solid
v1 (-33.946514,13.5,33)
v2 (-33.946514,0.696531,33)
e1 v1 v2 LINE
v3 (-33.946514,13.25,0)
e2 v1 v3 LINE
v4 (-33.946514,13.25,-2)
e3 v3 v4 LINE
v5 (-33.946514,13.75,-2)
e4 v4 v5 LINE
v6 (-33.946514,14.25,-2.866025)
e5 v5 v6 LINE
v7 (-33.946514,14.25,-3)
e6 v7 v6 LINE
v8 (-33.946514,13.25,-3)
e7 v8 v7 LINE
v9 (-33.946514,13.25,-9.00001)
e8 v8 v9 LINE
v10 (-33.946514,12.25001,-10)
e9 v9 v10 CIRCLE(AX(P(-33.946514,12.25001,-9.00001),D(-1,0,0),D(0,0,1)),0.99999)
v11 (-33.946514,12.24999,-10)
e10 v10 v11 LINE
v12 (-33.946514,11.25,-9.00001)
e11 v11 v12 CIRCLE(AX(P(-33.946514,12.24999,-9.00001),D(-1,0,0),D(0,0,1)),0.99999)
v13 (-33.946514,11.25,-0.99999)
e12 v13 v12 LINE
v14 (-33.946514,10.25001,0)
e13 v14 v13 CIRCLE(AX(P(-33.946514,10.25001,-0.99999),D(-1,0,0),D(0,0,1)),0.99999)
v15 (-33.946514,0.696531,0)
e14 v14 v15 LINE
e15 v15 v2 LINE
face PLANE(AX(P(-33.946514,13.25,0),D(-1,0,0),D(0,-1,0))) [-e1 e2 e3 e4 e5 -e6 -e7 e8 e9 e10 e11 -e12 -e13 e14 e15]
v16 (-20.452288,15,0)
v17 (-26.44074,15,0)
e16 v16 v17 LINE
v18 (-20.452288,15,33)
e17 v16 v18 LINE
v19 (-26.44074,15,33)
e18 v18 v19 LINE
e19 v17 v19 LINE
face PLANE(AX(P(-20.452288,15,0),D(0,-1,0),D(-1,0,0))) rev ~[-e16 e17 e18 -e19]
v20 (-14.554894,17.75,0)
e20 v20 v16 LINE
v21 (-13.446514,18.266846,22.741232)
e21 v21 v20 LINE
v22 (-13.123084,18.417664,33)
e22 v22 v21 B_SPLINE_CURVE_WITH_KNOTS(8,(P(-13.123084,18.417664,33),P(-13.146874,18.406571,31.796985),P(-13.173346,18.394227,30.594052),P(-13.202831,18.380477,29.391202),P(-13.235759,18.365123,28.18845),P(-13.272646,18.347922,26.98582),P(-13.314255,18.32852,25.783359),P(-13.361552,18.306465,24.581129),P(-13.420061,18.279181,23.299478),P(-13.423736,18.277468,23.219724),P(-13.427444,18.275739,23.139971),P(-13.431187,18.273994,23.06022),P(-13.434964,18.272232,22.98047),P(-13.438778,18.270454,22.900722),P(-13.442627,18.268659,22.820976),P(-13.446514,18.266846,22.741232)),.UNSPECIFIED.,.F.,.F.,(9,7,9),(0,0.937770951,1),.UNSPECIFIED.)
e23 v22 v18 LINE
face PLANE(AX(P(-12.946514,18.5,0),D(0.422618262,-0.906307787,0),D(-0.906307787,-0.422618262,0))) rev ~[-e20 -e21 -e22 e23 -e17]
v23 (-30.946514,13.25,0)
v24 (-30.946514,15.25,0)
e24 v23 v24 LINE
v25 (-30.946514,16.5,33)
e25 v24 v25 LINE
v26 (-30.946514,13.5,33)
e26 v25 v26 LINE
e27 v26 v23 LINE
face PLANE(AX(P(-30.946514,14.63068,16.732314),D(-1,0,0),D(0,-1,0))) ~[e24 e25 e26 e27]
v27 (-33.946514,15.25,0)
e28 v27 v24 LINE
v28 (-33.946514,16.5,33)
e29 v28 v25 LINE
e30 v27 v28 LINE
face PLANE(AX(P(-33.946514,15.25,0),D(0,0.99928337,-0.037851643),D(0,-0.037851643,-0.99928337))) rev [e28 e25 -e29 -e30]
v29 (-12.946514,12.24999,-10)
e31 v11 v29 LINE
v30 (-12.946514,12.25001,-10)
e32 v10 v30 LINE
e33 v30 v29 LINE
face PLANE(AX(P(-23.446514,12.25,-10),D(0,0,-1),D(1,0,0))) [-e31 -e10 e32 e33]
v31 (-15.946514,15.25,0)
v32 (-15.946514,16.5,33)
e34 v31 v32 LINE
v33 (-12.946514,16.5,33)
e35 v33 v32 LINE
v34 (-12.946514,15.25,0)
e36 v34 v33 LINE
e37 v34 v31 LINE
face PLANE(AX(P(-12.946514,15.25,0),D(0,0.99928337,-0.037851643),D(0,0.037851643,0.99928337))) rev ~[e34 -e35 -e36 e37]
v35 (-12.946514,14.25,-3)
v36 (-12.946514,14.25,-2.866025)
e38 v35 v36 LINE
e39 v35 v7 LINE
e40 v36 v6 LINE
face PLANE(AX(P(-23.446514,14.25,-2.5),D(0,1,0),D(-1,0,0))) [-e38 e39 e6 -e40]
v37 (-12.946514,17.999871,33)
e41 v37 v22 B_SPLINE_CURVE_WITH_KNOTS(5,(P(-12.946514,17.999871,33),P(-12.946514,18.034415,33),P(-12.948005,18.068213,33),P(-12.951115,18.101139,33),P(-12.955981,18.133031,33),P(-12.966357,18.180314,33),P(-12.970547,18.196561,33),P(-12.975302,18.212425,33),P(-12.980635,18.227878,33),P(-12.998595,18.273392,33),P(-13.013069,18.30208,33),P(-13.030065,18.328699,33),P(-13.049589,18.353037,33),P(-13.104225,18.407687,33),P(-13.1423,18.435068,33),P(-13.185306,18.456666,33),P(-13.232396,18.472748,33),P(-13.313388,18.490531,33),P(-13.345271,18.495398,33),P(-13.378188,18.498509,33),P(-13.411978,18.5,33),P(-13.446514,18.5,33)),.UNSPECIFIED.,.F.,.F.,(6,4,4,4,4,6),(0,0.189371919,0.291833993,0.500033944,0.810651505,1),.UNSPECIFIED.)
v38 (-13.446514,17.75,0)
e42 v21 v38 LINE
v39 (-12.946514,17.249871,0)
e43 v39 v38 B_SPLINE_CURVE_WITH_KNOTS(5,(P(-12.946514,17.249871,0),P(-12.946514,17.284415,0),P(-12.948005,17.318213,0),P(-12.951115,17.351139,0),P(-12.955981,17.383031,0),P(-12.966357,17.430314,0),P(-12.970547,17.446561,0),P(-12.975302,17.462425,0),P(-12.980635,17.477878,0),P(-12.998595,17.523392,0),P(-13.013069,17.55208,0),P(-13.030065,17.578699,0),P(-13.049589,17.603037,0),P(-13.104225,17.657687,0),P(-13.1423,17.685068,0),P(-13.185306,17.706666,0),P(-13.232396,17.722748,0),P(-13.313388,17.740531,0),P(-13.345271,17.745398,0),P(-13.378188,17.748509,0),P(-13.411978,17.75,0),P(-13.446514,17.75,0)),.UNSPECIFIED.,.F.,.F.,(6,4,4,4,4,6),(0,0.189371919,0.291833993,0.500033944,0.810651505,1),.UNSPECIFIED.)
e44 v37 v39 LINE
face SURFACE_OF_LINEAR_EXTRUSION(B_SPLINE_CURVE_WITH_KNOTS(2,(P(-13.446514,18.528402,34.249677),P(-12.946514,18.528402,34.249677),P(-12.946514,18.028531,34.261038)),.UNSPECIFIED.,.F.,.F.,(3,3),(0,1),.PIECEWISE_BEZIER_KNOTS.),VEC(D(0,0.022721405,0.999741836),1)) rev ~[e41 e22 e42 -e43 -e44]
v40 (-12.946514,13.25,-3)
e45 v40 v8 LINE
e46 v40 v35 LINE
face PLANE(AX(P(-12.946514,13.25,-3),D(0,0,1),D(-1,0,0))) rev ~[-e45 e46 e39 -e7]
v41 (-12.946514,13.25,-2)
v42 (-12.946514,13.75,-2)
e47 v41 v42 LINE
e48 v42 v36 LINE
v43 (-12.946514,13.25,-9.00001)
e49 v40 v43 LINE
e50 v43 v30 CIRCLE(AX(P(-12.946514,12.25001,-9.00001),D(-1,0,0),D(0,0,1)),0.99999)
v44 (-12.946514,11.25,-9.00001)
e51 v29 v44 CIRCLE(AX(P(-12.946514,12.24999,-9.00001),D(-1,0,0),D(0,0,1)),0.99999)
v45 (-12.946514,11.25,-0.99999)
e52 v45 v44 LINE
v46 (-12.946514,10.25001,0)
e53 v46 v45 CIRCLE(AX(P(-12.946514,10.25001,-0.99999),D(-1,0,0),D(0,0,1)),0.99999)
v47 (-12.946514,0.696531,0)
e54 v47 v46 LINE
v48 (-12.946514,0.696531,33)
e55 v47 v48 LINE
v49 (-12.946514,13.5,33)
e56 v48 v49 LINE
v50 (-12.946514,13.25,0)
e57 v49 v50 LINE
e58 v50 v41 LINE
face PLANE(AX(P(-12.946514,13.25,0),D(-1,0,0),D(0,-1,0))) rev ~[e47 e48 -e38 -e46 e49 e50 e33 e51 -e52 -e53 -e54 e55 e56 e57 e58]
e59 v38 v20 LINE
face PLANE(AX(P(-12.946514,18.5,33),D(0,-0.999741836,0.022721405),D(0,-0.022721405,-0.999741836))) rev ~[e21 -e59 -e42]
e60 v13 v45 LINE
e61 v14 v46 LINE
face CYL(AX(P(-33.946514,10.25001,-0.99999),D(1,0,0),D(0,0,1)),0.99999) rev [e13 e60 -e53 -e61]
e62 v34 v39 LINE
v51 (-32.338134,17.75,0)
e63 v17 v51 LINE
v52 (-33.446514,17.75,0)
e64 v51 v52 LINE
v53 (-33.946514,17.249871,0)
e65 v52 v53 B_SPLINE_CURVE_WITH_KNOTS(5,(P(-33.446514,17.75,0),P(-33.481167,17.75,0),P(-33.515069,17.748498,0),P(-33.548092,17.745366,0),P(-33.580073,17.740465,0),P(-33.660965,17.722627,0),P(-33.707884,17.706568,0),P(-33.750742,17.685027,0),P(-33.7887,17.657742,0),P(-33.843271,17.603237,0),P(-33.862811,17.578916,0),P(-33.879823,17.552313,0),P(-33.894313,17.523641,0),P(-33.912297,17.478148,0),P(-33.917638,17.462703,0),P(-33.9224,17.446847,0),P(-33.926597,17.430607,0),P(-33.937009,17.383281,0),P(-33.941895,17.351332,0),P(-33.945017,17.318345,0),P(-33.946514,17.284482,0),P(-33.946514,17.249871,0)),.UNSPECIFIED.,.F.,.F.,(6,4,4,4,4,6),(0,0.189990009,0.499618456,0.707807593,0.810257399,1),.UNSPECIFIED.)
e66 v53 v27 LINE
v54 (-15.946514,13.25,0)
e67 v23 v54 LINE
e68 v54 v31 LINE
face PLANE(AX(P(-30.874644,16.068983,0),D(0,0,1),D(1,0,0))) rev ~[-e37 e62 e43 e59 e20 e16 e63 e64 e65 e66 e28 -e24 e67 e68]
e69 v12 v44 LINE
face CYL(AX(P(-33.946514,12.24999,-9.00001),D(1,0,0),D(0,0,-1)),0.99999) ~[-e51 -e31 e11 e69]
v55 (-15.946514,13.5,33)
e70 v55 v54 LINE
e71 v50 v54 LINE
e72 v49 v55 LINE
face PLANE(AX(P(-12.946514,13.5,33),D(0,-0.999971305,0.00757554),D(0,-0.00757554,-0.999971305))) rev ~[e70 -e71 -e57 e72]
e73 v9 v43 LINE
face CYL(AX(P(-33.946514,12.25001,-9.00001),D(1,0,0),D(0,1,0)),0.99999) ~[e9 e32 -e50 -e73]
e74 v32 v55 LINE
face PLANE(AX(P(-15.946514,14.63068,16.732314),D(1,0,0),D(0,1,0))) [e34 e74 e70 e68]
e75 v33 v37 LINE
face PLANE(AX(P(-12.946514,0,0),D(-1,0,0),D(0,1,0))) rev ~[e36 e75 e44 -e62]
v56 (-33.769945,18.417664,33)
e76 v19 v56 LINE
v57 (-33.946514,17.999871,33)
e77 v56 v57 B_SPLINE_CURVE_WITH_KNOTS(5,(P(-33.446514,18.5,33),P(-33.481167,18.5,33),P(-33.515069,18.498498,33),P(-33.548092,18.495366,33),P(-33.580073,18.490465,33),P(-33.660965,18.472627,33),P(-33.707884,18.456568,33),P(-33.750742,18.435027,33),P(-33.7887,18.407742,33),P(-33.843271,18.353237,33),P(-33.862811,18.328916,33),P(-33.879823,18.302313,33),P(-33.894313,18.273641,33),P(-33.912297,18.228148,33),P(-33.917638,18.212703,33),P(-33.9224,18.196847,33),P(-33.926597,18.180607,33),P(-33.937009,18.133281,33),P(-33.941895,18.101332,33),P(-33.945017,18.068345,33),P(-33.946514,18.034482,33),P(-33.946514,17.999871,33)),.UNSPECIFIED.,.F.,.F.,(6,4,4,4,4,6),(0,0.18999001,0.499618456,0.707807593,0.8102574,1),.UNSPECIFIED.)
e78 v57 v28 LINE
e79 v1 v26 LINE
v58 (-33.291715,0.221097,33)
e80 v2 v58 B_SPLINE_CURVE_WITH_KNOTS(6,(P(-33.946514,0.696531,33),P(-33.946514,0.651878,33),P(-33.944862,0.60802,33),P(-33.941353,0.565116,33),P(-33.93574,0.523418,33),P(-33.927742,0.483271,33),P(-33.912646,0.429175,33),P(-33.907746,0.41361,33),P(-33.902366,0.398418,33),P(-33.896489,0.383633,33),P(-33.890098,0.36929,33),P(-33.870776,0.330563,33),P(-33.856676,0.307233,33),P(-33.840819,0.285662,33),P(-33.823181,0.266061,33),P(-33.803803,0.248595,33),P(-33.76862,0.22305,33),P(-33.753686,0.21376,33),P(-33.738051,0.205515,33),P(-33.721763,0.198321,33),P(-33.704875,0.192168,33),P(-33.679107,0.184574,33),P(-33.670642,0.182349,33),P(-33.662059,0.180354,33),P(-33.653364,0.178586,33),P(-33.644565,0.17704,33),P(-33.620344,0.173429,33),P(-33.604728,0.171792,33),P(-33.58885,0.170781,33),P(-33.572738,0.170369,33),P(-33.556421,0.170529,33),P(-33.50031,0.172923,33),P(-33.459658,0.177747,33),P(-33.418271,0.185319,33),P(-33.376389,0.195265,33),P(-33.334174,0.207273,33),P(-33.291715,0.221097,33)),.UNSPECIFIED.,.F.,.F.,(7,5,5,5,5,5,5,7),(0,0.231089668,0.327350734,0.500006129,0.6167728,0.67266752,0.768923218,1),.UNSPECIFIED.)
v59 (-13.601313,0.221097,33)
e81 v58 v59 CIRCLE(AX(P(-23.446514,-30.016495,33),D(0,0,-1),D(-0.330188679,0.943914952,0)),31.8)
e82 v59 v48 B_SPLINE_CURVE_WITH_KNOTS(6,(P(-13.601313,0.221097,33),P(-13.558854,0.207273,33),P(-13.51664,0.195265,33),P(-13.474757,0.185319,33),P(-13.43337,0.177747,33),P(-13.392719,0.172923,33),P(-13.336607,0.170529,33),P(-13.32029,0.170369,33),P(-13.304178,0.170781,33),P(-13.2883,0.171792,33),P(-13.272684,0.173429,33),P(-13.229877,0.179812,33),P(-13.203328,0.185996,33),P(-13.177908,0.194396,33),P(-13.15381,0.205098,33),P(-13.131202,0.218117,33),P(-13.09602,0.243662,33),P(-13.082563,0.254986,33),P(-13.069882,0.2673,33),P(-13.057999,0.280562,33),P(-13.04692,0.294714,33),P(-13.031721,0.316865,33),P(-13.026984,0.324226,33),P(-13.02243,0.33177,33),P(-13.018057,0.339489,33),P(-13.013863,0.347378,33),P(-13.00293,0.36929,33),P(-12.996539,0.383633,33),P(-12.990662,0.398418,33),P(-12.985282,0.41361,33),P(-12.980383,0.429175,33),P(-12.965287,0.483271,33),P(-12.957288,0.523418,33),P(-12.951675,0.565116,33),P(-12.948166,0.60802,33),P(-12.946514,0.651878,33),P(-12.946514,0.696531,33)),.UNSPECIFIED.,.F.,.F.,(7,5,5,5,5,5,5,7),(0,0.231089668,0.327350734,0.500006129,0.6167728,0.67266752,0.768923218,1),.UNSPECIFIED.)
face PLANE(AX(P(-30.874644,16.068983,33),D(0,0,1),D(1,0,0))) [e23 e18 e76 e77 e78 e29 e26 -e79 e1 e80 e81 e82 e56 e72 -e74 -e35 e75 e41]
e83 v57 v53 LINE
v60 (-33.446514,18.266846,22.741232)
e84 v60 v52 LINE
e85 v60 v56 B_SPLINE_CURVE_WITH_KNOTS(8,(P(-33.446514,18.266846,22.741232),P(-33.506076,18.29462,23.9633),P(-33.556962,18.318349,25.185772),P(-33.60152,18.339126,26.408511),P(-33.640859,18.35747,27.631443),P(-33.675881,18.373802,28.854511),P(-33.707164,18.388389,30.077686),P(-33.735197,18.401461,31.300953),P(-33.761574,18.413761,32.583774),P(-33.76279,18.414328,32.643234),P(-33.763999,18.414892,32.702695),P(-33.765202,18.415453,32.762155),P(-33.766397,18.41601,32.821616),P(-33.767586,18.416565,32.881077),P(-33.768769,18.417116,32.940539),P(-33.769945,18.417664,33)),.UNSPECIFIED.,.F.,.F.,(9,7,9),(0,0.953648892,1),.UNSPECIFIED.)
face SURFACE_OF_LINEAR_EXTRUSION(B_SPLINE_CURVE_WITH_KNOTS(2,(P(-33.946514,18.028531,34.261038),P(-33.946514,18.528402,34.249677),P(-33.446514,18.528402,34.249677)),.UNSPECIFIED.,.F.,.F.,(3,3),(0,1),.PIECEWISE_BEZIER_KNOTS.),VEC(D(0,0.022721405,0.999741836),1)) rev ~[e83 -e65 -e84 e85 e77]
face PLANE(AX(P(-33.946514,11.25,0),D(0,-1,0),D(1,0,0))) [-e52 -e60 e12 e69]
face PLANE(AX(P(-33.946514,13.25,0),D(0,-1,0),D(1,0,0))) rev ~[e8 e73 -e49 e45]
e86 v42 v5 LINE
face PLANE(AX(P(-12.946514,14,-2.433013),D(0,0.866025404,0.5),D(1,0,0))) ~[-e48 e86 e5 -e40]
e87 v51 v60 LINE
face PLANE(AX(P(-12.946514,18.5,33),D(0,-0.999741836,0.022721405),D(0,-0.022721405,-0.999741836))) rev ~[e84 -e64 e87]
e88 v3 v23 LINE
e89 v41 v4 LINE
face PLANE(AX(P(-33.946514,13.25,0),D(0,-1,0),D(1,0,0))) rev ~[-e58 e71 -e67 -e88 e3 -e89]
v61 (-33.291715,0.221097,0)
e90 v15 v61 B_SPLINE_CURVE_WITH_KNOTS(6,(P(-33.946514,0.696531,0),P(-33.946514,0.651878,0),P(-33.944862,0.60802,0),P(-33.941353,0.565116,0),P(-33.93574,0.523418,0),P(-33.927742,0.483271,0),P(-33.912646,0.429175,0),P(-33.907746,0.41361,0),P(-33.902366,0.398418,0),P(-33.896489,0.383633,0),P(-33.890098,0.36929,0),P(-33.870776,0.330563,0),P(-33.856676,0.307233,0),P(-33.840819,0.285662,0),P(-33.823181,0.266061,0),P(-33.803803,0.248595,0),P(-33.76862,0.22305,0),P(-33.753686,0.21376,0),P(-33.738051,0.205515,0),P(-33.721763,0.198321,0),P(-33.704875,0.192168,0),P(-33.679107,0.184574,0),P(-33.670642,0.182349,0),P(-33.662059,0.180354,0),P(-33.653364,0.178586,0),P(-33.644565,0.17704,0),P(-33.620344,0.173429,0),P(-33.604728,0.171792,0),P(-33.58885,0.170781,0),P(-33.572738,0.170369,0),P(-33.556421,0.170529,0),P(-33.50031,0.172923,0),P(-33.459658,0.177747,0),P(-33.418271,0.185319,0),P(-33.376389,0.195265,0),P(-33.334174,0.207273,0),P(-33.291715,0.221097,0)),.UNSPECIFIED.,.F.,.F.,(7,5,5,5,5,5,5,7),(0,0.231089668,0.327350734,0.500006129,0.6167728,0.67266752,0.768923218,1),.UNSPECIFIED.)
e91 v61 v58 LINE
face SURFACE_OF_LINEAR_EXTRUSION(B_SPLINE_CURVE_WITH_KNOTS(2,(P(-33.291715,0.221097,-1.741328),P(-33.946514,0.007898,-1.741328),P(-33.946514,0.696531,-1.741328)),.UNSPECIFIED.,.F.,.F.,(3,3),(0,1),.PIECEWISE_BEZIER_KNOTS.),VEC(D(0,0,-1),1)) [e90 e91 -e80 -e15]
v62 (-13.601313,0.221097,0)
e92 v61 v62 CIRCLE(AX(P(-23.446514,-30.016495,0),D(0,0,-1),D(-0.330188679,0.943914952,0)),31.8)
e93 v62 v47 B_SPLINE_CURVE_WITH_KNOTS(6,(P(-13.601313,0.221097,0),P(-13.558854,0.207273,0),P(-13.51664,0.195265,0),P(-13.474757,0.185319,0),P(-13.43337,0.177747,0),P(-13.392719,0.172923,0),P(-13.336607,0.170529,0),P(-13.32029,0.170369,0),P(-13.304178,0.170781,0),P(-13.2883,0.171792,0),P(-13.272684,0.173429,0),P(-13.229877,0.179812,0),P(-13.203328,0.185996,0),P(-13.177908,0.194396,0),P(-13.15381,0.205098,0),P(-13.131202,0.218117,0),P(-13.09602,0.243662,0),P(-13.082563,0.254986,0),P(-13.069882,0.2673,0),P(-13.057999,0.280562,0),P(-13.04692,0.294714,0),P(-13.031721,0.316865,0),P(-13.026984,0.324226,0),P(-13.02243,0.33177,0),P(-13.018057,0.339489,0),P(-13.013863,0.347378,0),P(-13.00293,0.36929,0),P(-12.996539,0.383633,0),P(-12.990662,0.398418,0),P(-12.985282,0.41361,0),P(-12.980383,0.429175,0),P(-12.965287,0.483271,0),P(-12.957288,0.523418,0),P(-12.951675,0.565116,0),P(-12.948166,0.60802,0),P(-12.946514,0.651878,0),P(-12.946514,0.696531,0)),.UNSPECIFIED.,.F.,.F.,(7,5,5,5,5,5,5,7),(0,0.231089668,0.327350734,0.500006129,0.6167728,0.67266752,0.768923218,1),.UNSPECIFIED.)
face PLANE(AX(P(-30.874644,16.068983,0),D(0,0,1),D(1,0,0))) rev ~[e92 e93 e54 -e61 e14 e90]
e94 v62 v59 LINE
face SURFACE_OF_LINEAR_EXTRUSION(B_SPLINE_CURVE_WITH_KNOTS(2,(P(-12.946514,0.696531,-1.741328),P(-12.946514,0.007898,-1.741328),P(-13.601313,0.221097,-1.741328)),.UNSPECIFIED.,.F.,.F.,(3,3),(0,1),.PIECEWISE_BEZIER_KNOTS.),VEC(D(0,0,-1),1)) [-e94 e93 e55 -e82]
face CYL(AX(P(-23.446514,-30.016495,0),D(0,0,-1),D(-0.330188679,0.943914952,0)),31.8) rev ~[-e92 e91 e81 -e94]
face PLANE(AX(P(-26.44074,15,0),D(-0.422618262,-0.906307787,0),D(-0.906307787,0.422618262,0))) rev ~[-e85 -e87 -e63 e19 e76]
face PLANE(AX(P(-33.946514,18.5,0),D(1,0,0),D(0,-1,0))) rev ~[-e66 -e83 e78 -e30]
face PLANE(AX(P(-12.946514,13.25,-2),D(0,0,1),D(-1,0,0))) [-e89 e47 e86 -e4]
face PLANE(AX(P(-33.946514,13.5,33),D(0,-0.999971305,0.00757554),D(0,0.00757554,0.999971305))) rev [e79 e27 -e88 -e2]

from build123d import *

# Parameters (mm, degrees)
F1_DEPTH    = 33
F3_DEPTH    = 21.001
F4_DEPTH    = 3
F6_T1_DEPTH = 35.508521627
F6_T3_DEPTH = 36.4826554363
F7_W        = 21
F7_H        = 2
F8_DEPTH    = 10
F9_W        = 21
F9_H        = 1
F10_DEPTH   = 1
F11_SIZE2   = 0.8660254038
F11_SIZE    = 0.5
F12_R       = 0.99999


# Not quite as in the source:
# - a fillet or chamfer that OpenCascade refuses, or shapes differently, is made with other operations: its cross-section is extruded or revolved along the edge and cut away or added
# - a fillet or chamfer is up to 0.001 mm smaller than in the source, because OpenCascade refuses the exact size
# - a pattern or mirror of a feature is missing from the dataset's text; its kind, count and spacing are read off the source's solid


with BuildPart() as f1:
    # F0 (on Top) → F1 (new body)
    with BuildSketch(Plane.XY):
        Polygon((-33.9465141296, 18.5), (-33.9465141296, 15), (-26.4407399079, 15), align=None)
        Polygon((-20.4522883514, 15), (-12.9465141296, 15), (-12.9465141296, 18.5), align=None)
        with BuildLine():
            Line((-33.9465141296, 15), (-33.9465141296, 0))
            ThreePointArc((-33.9465141296, 0), (-23.4465141296, 1.783504535), (-12.9465141296, 0))
            Line((-12.9465141296, 0), (-12.9465141296, 15))
            Line((-12.9465141296, 15), (-20.4522883514, 15))
            Line((-20.4522883514, 15), (-26.4407399079, 15))
            Line((-26.4407399079, 15), (-33.9465141296, 15))
        make_face()
    extrude(amount=F1_DEPTH)

    # F2 (on face) → F3 (cut, through all)
    with BuildSketch(Plane.YZ.offset(-12.9465141296)):
        Polygon((18.5, 0), (18.5, 33), (17.75, 0), align=None)
    extrude(amount=-F3_DEPTH, mode=Mode.SUBTRACT)

    # F2 (on face) → F4 (cut)
    with BuildSketch(Plane.YZ.offset(-12.9465141296)):
        Polygon((15.25, 0), (16.5, 33), (13.5, 33), (13.25, 0), align=None)
    f4 = extrude(amount=-F4_DEPTH, mode=Mode.SUBTRACT)

    # F4_copies: F4 across plane
    add(f4.mirror(Plane(origin=(-23.446514, 0, 0), x_dir=(0, 0, -1), z_dir=(-1, 0, 0))), mode=Mode.SUBTRACT)

    # F6: fillet of radius 0.5 on 4 edges, made by hand

    # F6_s2 → F6_t1 (cut)
    with BuildSketch(Plane(origin=(0, 0.7875654118, 34.6528781205), x_dir=(1, 0, 0), z_dir=(0, -0.0227214054, -0.9997418355))):
        with BuildLine():
            add(Edge.make_bspline(
                [(-13.4465141296, -17.7454175809), (-12.9465141296, -17.7454175809), (-12.9465141296, -17.2454175809)],
                knots=[0, 0, 0, 1, 1, 1], degree=2, weights=[1, 1, 1]))
            Line((-12.9465141296, -17.2454175809), (-12.9465141296, -17.7454175809))
            Line((-12.9465141296, -17.7454175809), (-13.4465141296, -17.7454175809))
        make_face()
        with BuildLine():
            add(Edge.make_bspline(
                [(-33.9465141296, -17.2454175809), (-33.9465141296, -17.7454175809), (-33.4465141296, -17.7454175809)],
                knots=[0, 0, 0, 1, 1, 1], degree=2, weights=[1, 1, 1]))
            Line((-33.4465141296, -17.7454175809), (-33.9465141296, -17.7454175809))
            Line((-33.9465141296, -17.7454175809), (-33.9465141296, -17.2454175809))
        make_face()
    extrude(amount=F6_T1_DEPTH, mode=Mode.SUBTRACT)

    # F6_s4 → F6_t3 (cut)
    with BuildSketch(Plane.XY.offset(-1.7413277182)):
        with BuildLine():
            add(Edge.make_bspline(
                [(-33.291715368, 0.2210972397), (-33.9465141296, 0.0078982049), (-33.9465141296, 0.6965310873)],
                knots=[0, 0, 0, 1, 1, 1], degree=2, weights=[1, 1, 1]))
            Line((-33.9465141296, 0.6965310873), (-33.9465141296, 0))
            ThreePointArc((-33.9465141296, 0), (-33.6197154132, 0.1123275396), (-33.291715368, 0.2210972397))
        make_face()
        with BuildLine():
            add(Edge.make_bspline(
                [(-12.9465141296, 0.6965310873), (-12.9465141296, 0.0078982049), (-13.6013128912, 0.2210972397)],
                knots=[0, 0, 0, 1, 1, 1], degree=2, weights=[1, 1, 1]))
            ThreePointArc((-13.6013128912, 0.2210972397), (-13.2733128461, 0.1123275396), (-12.9465141296, 0))
            Line((-12.9465141296, 0), (-12.9465141296, 0.6965310873))
        make_face()
    extrude(amount=F6_T3_DEPTH, mode=Mode.SUBTRACT)

    # F7 (on face) → F8 (join)
    with BuildSketch(Plane(origin=(0, 0, 0), x_dir=(1, 0, 0), z_dir=(0, 0, -1))):
        with Locations((-23.4465141296, -12.25)):
            Rectangle(F7_W, F7_H)
    extrude(amount=F8_DEPTH)

    # F9 (on face) → F10 (join)
    with BuildSketch(Plane(origin=(0, 13.25, 0), x_dir=(-1, 0, 0), z_dir=(0, 1, 0))):
        with Locations((23.4465141296, -2.5)):
            Rectangle(F9_W, F9_H)
    extrude(amount=F10_DEPTH)

    # F11
    f11_edges = [f1.edges().sort_by_distance(p)[0] for p in [
        (-23.446514, 14.25, -2),
    ]]
    f11_side = f1.faces().sort_by_distance((-23.446514, 13.75, -2))[0]
    chamfer(f11_edges, length=F11_SIZE, length2=F11_SIZE2, reference=f11_side)

    # F12 (radius 1 in the source; OpenCascade refuses exactly that, so slightly less here)
    f12_edges = [f1.edges().sort_by_distance(p)[0] for p in [
        (-23.446514, 11.25, 0),
        (-23.446514, 13.25, -10),
        (-23.446514, 11.25, -10),
    ]]
    fillet(f12_edges, radius=F12_R)


solid = f1.part
